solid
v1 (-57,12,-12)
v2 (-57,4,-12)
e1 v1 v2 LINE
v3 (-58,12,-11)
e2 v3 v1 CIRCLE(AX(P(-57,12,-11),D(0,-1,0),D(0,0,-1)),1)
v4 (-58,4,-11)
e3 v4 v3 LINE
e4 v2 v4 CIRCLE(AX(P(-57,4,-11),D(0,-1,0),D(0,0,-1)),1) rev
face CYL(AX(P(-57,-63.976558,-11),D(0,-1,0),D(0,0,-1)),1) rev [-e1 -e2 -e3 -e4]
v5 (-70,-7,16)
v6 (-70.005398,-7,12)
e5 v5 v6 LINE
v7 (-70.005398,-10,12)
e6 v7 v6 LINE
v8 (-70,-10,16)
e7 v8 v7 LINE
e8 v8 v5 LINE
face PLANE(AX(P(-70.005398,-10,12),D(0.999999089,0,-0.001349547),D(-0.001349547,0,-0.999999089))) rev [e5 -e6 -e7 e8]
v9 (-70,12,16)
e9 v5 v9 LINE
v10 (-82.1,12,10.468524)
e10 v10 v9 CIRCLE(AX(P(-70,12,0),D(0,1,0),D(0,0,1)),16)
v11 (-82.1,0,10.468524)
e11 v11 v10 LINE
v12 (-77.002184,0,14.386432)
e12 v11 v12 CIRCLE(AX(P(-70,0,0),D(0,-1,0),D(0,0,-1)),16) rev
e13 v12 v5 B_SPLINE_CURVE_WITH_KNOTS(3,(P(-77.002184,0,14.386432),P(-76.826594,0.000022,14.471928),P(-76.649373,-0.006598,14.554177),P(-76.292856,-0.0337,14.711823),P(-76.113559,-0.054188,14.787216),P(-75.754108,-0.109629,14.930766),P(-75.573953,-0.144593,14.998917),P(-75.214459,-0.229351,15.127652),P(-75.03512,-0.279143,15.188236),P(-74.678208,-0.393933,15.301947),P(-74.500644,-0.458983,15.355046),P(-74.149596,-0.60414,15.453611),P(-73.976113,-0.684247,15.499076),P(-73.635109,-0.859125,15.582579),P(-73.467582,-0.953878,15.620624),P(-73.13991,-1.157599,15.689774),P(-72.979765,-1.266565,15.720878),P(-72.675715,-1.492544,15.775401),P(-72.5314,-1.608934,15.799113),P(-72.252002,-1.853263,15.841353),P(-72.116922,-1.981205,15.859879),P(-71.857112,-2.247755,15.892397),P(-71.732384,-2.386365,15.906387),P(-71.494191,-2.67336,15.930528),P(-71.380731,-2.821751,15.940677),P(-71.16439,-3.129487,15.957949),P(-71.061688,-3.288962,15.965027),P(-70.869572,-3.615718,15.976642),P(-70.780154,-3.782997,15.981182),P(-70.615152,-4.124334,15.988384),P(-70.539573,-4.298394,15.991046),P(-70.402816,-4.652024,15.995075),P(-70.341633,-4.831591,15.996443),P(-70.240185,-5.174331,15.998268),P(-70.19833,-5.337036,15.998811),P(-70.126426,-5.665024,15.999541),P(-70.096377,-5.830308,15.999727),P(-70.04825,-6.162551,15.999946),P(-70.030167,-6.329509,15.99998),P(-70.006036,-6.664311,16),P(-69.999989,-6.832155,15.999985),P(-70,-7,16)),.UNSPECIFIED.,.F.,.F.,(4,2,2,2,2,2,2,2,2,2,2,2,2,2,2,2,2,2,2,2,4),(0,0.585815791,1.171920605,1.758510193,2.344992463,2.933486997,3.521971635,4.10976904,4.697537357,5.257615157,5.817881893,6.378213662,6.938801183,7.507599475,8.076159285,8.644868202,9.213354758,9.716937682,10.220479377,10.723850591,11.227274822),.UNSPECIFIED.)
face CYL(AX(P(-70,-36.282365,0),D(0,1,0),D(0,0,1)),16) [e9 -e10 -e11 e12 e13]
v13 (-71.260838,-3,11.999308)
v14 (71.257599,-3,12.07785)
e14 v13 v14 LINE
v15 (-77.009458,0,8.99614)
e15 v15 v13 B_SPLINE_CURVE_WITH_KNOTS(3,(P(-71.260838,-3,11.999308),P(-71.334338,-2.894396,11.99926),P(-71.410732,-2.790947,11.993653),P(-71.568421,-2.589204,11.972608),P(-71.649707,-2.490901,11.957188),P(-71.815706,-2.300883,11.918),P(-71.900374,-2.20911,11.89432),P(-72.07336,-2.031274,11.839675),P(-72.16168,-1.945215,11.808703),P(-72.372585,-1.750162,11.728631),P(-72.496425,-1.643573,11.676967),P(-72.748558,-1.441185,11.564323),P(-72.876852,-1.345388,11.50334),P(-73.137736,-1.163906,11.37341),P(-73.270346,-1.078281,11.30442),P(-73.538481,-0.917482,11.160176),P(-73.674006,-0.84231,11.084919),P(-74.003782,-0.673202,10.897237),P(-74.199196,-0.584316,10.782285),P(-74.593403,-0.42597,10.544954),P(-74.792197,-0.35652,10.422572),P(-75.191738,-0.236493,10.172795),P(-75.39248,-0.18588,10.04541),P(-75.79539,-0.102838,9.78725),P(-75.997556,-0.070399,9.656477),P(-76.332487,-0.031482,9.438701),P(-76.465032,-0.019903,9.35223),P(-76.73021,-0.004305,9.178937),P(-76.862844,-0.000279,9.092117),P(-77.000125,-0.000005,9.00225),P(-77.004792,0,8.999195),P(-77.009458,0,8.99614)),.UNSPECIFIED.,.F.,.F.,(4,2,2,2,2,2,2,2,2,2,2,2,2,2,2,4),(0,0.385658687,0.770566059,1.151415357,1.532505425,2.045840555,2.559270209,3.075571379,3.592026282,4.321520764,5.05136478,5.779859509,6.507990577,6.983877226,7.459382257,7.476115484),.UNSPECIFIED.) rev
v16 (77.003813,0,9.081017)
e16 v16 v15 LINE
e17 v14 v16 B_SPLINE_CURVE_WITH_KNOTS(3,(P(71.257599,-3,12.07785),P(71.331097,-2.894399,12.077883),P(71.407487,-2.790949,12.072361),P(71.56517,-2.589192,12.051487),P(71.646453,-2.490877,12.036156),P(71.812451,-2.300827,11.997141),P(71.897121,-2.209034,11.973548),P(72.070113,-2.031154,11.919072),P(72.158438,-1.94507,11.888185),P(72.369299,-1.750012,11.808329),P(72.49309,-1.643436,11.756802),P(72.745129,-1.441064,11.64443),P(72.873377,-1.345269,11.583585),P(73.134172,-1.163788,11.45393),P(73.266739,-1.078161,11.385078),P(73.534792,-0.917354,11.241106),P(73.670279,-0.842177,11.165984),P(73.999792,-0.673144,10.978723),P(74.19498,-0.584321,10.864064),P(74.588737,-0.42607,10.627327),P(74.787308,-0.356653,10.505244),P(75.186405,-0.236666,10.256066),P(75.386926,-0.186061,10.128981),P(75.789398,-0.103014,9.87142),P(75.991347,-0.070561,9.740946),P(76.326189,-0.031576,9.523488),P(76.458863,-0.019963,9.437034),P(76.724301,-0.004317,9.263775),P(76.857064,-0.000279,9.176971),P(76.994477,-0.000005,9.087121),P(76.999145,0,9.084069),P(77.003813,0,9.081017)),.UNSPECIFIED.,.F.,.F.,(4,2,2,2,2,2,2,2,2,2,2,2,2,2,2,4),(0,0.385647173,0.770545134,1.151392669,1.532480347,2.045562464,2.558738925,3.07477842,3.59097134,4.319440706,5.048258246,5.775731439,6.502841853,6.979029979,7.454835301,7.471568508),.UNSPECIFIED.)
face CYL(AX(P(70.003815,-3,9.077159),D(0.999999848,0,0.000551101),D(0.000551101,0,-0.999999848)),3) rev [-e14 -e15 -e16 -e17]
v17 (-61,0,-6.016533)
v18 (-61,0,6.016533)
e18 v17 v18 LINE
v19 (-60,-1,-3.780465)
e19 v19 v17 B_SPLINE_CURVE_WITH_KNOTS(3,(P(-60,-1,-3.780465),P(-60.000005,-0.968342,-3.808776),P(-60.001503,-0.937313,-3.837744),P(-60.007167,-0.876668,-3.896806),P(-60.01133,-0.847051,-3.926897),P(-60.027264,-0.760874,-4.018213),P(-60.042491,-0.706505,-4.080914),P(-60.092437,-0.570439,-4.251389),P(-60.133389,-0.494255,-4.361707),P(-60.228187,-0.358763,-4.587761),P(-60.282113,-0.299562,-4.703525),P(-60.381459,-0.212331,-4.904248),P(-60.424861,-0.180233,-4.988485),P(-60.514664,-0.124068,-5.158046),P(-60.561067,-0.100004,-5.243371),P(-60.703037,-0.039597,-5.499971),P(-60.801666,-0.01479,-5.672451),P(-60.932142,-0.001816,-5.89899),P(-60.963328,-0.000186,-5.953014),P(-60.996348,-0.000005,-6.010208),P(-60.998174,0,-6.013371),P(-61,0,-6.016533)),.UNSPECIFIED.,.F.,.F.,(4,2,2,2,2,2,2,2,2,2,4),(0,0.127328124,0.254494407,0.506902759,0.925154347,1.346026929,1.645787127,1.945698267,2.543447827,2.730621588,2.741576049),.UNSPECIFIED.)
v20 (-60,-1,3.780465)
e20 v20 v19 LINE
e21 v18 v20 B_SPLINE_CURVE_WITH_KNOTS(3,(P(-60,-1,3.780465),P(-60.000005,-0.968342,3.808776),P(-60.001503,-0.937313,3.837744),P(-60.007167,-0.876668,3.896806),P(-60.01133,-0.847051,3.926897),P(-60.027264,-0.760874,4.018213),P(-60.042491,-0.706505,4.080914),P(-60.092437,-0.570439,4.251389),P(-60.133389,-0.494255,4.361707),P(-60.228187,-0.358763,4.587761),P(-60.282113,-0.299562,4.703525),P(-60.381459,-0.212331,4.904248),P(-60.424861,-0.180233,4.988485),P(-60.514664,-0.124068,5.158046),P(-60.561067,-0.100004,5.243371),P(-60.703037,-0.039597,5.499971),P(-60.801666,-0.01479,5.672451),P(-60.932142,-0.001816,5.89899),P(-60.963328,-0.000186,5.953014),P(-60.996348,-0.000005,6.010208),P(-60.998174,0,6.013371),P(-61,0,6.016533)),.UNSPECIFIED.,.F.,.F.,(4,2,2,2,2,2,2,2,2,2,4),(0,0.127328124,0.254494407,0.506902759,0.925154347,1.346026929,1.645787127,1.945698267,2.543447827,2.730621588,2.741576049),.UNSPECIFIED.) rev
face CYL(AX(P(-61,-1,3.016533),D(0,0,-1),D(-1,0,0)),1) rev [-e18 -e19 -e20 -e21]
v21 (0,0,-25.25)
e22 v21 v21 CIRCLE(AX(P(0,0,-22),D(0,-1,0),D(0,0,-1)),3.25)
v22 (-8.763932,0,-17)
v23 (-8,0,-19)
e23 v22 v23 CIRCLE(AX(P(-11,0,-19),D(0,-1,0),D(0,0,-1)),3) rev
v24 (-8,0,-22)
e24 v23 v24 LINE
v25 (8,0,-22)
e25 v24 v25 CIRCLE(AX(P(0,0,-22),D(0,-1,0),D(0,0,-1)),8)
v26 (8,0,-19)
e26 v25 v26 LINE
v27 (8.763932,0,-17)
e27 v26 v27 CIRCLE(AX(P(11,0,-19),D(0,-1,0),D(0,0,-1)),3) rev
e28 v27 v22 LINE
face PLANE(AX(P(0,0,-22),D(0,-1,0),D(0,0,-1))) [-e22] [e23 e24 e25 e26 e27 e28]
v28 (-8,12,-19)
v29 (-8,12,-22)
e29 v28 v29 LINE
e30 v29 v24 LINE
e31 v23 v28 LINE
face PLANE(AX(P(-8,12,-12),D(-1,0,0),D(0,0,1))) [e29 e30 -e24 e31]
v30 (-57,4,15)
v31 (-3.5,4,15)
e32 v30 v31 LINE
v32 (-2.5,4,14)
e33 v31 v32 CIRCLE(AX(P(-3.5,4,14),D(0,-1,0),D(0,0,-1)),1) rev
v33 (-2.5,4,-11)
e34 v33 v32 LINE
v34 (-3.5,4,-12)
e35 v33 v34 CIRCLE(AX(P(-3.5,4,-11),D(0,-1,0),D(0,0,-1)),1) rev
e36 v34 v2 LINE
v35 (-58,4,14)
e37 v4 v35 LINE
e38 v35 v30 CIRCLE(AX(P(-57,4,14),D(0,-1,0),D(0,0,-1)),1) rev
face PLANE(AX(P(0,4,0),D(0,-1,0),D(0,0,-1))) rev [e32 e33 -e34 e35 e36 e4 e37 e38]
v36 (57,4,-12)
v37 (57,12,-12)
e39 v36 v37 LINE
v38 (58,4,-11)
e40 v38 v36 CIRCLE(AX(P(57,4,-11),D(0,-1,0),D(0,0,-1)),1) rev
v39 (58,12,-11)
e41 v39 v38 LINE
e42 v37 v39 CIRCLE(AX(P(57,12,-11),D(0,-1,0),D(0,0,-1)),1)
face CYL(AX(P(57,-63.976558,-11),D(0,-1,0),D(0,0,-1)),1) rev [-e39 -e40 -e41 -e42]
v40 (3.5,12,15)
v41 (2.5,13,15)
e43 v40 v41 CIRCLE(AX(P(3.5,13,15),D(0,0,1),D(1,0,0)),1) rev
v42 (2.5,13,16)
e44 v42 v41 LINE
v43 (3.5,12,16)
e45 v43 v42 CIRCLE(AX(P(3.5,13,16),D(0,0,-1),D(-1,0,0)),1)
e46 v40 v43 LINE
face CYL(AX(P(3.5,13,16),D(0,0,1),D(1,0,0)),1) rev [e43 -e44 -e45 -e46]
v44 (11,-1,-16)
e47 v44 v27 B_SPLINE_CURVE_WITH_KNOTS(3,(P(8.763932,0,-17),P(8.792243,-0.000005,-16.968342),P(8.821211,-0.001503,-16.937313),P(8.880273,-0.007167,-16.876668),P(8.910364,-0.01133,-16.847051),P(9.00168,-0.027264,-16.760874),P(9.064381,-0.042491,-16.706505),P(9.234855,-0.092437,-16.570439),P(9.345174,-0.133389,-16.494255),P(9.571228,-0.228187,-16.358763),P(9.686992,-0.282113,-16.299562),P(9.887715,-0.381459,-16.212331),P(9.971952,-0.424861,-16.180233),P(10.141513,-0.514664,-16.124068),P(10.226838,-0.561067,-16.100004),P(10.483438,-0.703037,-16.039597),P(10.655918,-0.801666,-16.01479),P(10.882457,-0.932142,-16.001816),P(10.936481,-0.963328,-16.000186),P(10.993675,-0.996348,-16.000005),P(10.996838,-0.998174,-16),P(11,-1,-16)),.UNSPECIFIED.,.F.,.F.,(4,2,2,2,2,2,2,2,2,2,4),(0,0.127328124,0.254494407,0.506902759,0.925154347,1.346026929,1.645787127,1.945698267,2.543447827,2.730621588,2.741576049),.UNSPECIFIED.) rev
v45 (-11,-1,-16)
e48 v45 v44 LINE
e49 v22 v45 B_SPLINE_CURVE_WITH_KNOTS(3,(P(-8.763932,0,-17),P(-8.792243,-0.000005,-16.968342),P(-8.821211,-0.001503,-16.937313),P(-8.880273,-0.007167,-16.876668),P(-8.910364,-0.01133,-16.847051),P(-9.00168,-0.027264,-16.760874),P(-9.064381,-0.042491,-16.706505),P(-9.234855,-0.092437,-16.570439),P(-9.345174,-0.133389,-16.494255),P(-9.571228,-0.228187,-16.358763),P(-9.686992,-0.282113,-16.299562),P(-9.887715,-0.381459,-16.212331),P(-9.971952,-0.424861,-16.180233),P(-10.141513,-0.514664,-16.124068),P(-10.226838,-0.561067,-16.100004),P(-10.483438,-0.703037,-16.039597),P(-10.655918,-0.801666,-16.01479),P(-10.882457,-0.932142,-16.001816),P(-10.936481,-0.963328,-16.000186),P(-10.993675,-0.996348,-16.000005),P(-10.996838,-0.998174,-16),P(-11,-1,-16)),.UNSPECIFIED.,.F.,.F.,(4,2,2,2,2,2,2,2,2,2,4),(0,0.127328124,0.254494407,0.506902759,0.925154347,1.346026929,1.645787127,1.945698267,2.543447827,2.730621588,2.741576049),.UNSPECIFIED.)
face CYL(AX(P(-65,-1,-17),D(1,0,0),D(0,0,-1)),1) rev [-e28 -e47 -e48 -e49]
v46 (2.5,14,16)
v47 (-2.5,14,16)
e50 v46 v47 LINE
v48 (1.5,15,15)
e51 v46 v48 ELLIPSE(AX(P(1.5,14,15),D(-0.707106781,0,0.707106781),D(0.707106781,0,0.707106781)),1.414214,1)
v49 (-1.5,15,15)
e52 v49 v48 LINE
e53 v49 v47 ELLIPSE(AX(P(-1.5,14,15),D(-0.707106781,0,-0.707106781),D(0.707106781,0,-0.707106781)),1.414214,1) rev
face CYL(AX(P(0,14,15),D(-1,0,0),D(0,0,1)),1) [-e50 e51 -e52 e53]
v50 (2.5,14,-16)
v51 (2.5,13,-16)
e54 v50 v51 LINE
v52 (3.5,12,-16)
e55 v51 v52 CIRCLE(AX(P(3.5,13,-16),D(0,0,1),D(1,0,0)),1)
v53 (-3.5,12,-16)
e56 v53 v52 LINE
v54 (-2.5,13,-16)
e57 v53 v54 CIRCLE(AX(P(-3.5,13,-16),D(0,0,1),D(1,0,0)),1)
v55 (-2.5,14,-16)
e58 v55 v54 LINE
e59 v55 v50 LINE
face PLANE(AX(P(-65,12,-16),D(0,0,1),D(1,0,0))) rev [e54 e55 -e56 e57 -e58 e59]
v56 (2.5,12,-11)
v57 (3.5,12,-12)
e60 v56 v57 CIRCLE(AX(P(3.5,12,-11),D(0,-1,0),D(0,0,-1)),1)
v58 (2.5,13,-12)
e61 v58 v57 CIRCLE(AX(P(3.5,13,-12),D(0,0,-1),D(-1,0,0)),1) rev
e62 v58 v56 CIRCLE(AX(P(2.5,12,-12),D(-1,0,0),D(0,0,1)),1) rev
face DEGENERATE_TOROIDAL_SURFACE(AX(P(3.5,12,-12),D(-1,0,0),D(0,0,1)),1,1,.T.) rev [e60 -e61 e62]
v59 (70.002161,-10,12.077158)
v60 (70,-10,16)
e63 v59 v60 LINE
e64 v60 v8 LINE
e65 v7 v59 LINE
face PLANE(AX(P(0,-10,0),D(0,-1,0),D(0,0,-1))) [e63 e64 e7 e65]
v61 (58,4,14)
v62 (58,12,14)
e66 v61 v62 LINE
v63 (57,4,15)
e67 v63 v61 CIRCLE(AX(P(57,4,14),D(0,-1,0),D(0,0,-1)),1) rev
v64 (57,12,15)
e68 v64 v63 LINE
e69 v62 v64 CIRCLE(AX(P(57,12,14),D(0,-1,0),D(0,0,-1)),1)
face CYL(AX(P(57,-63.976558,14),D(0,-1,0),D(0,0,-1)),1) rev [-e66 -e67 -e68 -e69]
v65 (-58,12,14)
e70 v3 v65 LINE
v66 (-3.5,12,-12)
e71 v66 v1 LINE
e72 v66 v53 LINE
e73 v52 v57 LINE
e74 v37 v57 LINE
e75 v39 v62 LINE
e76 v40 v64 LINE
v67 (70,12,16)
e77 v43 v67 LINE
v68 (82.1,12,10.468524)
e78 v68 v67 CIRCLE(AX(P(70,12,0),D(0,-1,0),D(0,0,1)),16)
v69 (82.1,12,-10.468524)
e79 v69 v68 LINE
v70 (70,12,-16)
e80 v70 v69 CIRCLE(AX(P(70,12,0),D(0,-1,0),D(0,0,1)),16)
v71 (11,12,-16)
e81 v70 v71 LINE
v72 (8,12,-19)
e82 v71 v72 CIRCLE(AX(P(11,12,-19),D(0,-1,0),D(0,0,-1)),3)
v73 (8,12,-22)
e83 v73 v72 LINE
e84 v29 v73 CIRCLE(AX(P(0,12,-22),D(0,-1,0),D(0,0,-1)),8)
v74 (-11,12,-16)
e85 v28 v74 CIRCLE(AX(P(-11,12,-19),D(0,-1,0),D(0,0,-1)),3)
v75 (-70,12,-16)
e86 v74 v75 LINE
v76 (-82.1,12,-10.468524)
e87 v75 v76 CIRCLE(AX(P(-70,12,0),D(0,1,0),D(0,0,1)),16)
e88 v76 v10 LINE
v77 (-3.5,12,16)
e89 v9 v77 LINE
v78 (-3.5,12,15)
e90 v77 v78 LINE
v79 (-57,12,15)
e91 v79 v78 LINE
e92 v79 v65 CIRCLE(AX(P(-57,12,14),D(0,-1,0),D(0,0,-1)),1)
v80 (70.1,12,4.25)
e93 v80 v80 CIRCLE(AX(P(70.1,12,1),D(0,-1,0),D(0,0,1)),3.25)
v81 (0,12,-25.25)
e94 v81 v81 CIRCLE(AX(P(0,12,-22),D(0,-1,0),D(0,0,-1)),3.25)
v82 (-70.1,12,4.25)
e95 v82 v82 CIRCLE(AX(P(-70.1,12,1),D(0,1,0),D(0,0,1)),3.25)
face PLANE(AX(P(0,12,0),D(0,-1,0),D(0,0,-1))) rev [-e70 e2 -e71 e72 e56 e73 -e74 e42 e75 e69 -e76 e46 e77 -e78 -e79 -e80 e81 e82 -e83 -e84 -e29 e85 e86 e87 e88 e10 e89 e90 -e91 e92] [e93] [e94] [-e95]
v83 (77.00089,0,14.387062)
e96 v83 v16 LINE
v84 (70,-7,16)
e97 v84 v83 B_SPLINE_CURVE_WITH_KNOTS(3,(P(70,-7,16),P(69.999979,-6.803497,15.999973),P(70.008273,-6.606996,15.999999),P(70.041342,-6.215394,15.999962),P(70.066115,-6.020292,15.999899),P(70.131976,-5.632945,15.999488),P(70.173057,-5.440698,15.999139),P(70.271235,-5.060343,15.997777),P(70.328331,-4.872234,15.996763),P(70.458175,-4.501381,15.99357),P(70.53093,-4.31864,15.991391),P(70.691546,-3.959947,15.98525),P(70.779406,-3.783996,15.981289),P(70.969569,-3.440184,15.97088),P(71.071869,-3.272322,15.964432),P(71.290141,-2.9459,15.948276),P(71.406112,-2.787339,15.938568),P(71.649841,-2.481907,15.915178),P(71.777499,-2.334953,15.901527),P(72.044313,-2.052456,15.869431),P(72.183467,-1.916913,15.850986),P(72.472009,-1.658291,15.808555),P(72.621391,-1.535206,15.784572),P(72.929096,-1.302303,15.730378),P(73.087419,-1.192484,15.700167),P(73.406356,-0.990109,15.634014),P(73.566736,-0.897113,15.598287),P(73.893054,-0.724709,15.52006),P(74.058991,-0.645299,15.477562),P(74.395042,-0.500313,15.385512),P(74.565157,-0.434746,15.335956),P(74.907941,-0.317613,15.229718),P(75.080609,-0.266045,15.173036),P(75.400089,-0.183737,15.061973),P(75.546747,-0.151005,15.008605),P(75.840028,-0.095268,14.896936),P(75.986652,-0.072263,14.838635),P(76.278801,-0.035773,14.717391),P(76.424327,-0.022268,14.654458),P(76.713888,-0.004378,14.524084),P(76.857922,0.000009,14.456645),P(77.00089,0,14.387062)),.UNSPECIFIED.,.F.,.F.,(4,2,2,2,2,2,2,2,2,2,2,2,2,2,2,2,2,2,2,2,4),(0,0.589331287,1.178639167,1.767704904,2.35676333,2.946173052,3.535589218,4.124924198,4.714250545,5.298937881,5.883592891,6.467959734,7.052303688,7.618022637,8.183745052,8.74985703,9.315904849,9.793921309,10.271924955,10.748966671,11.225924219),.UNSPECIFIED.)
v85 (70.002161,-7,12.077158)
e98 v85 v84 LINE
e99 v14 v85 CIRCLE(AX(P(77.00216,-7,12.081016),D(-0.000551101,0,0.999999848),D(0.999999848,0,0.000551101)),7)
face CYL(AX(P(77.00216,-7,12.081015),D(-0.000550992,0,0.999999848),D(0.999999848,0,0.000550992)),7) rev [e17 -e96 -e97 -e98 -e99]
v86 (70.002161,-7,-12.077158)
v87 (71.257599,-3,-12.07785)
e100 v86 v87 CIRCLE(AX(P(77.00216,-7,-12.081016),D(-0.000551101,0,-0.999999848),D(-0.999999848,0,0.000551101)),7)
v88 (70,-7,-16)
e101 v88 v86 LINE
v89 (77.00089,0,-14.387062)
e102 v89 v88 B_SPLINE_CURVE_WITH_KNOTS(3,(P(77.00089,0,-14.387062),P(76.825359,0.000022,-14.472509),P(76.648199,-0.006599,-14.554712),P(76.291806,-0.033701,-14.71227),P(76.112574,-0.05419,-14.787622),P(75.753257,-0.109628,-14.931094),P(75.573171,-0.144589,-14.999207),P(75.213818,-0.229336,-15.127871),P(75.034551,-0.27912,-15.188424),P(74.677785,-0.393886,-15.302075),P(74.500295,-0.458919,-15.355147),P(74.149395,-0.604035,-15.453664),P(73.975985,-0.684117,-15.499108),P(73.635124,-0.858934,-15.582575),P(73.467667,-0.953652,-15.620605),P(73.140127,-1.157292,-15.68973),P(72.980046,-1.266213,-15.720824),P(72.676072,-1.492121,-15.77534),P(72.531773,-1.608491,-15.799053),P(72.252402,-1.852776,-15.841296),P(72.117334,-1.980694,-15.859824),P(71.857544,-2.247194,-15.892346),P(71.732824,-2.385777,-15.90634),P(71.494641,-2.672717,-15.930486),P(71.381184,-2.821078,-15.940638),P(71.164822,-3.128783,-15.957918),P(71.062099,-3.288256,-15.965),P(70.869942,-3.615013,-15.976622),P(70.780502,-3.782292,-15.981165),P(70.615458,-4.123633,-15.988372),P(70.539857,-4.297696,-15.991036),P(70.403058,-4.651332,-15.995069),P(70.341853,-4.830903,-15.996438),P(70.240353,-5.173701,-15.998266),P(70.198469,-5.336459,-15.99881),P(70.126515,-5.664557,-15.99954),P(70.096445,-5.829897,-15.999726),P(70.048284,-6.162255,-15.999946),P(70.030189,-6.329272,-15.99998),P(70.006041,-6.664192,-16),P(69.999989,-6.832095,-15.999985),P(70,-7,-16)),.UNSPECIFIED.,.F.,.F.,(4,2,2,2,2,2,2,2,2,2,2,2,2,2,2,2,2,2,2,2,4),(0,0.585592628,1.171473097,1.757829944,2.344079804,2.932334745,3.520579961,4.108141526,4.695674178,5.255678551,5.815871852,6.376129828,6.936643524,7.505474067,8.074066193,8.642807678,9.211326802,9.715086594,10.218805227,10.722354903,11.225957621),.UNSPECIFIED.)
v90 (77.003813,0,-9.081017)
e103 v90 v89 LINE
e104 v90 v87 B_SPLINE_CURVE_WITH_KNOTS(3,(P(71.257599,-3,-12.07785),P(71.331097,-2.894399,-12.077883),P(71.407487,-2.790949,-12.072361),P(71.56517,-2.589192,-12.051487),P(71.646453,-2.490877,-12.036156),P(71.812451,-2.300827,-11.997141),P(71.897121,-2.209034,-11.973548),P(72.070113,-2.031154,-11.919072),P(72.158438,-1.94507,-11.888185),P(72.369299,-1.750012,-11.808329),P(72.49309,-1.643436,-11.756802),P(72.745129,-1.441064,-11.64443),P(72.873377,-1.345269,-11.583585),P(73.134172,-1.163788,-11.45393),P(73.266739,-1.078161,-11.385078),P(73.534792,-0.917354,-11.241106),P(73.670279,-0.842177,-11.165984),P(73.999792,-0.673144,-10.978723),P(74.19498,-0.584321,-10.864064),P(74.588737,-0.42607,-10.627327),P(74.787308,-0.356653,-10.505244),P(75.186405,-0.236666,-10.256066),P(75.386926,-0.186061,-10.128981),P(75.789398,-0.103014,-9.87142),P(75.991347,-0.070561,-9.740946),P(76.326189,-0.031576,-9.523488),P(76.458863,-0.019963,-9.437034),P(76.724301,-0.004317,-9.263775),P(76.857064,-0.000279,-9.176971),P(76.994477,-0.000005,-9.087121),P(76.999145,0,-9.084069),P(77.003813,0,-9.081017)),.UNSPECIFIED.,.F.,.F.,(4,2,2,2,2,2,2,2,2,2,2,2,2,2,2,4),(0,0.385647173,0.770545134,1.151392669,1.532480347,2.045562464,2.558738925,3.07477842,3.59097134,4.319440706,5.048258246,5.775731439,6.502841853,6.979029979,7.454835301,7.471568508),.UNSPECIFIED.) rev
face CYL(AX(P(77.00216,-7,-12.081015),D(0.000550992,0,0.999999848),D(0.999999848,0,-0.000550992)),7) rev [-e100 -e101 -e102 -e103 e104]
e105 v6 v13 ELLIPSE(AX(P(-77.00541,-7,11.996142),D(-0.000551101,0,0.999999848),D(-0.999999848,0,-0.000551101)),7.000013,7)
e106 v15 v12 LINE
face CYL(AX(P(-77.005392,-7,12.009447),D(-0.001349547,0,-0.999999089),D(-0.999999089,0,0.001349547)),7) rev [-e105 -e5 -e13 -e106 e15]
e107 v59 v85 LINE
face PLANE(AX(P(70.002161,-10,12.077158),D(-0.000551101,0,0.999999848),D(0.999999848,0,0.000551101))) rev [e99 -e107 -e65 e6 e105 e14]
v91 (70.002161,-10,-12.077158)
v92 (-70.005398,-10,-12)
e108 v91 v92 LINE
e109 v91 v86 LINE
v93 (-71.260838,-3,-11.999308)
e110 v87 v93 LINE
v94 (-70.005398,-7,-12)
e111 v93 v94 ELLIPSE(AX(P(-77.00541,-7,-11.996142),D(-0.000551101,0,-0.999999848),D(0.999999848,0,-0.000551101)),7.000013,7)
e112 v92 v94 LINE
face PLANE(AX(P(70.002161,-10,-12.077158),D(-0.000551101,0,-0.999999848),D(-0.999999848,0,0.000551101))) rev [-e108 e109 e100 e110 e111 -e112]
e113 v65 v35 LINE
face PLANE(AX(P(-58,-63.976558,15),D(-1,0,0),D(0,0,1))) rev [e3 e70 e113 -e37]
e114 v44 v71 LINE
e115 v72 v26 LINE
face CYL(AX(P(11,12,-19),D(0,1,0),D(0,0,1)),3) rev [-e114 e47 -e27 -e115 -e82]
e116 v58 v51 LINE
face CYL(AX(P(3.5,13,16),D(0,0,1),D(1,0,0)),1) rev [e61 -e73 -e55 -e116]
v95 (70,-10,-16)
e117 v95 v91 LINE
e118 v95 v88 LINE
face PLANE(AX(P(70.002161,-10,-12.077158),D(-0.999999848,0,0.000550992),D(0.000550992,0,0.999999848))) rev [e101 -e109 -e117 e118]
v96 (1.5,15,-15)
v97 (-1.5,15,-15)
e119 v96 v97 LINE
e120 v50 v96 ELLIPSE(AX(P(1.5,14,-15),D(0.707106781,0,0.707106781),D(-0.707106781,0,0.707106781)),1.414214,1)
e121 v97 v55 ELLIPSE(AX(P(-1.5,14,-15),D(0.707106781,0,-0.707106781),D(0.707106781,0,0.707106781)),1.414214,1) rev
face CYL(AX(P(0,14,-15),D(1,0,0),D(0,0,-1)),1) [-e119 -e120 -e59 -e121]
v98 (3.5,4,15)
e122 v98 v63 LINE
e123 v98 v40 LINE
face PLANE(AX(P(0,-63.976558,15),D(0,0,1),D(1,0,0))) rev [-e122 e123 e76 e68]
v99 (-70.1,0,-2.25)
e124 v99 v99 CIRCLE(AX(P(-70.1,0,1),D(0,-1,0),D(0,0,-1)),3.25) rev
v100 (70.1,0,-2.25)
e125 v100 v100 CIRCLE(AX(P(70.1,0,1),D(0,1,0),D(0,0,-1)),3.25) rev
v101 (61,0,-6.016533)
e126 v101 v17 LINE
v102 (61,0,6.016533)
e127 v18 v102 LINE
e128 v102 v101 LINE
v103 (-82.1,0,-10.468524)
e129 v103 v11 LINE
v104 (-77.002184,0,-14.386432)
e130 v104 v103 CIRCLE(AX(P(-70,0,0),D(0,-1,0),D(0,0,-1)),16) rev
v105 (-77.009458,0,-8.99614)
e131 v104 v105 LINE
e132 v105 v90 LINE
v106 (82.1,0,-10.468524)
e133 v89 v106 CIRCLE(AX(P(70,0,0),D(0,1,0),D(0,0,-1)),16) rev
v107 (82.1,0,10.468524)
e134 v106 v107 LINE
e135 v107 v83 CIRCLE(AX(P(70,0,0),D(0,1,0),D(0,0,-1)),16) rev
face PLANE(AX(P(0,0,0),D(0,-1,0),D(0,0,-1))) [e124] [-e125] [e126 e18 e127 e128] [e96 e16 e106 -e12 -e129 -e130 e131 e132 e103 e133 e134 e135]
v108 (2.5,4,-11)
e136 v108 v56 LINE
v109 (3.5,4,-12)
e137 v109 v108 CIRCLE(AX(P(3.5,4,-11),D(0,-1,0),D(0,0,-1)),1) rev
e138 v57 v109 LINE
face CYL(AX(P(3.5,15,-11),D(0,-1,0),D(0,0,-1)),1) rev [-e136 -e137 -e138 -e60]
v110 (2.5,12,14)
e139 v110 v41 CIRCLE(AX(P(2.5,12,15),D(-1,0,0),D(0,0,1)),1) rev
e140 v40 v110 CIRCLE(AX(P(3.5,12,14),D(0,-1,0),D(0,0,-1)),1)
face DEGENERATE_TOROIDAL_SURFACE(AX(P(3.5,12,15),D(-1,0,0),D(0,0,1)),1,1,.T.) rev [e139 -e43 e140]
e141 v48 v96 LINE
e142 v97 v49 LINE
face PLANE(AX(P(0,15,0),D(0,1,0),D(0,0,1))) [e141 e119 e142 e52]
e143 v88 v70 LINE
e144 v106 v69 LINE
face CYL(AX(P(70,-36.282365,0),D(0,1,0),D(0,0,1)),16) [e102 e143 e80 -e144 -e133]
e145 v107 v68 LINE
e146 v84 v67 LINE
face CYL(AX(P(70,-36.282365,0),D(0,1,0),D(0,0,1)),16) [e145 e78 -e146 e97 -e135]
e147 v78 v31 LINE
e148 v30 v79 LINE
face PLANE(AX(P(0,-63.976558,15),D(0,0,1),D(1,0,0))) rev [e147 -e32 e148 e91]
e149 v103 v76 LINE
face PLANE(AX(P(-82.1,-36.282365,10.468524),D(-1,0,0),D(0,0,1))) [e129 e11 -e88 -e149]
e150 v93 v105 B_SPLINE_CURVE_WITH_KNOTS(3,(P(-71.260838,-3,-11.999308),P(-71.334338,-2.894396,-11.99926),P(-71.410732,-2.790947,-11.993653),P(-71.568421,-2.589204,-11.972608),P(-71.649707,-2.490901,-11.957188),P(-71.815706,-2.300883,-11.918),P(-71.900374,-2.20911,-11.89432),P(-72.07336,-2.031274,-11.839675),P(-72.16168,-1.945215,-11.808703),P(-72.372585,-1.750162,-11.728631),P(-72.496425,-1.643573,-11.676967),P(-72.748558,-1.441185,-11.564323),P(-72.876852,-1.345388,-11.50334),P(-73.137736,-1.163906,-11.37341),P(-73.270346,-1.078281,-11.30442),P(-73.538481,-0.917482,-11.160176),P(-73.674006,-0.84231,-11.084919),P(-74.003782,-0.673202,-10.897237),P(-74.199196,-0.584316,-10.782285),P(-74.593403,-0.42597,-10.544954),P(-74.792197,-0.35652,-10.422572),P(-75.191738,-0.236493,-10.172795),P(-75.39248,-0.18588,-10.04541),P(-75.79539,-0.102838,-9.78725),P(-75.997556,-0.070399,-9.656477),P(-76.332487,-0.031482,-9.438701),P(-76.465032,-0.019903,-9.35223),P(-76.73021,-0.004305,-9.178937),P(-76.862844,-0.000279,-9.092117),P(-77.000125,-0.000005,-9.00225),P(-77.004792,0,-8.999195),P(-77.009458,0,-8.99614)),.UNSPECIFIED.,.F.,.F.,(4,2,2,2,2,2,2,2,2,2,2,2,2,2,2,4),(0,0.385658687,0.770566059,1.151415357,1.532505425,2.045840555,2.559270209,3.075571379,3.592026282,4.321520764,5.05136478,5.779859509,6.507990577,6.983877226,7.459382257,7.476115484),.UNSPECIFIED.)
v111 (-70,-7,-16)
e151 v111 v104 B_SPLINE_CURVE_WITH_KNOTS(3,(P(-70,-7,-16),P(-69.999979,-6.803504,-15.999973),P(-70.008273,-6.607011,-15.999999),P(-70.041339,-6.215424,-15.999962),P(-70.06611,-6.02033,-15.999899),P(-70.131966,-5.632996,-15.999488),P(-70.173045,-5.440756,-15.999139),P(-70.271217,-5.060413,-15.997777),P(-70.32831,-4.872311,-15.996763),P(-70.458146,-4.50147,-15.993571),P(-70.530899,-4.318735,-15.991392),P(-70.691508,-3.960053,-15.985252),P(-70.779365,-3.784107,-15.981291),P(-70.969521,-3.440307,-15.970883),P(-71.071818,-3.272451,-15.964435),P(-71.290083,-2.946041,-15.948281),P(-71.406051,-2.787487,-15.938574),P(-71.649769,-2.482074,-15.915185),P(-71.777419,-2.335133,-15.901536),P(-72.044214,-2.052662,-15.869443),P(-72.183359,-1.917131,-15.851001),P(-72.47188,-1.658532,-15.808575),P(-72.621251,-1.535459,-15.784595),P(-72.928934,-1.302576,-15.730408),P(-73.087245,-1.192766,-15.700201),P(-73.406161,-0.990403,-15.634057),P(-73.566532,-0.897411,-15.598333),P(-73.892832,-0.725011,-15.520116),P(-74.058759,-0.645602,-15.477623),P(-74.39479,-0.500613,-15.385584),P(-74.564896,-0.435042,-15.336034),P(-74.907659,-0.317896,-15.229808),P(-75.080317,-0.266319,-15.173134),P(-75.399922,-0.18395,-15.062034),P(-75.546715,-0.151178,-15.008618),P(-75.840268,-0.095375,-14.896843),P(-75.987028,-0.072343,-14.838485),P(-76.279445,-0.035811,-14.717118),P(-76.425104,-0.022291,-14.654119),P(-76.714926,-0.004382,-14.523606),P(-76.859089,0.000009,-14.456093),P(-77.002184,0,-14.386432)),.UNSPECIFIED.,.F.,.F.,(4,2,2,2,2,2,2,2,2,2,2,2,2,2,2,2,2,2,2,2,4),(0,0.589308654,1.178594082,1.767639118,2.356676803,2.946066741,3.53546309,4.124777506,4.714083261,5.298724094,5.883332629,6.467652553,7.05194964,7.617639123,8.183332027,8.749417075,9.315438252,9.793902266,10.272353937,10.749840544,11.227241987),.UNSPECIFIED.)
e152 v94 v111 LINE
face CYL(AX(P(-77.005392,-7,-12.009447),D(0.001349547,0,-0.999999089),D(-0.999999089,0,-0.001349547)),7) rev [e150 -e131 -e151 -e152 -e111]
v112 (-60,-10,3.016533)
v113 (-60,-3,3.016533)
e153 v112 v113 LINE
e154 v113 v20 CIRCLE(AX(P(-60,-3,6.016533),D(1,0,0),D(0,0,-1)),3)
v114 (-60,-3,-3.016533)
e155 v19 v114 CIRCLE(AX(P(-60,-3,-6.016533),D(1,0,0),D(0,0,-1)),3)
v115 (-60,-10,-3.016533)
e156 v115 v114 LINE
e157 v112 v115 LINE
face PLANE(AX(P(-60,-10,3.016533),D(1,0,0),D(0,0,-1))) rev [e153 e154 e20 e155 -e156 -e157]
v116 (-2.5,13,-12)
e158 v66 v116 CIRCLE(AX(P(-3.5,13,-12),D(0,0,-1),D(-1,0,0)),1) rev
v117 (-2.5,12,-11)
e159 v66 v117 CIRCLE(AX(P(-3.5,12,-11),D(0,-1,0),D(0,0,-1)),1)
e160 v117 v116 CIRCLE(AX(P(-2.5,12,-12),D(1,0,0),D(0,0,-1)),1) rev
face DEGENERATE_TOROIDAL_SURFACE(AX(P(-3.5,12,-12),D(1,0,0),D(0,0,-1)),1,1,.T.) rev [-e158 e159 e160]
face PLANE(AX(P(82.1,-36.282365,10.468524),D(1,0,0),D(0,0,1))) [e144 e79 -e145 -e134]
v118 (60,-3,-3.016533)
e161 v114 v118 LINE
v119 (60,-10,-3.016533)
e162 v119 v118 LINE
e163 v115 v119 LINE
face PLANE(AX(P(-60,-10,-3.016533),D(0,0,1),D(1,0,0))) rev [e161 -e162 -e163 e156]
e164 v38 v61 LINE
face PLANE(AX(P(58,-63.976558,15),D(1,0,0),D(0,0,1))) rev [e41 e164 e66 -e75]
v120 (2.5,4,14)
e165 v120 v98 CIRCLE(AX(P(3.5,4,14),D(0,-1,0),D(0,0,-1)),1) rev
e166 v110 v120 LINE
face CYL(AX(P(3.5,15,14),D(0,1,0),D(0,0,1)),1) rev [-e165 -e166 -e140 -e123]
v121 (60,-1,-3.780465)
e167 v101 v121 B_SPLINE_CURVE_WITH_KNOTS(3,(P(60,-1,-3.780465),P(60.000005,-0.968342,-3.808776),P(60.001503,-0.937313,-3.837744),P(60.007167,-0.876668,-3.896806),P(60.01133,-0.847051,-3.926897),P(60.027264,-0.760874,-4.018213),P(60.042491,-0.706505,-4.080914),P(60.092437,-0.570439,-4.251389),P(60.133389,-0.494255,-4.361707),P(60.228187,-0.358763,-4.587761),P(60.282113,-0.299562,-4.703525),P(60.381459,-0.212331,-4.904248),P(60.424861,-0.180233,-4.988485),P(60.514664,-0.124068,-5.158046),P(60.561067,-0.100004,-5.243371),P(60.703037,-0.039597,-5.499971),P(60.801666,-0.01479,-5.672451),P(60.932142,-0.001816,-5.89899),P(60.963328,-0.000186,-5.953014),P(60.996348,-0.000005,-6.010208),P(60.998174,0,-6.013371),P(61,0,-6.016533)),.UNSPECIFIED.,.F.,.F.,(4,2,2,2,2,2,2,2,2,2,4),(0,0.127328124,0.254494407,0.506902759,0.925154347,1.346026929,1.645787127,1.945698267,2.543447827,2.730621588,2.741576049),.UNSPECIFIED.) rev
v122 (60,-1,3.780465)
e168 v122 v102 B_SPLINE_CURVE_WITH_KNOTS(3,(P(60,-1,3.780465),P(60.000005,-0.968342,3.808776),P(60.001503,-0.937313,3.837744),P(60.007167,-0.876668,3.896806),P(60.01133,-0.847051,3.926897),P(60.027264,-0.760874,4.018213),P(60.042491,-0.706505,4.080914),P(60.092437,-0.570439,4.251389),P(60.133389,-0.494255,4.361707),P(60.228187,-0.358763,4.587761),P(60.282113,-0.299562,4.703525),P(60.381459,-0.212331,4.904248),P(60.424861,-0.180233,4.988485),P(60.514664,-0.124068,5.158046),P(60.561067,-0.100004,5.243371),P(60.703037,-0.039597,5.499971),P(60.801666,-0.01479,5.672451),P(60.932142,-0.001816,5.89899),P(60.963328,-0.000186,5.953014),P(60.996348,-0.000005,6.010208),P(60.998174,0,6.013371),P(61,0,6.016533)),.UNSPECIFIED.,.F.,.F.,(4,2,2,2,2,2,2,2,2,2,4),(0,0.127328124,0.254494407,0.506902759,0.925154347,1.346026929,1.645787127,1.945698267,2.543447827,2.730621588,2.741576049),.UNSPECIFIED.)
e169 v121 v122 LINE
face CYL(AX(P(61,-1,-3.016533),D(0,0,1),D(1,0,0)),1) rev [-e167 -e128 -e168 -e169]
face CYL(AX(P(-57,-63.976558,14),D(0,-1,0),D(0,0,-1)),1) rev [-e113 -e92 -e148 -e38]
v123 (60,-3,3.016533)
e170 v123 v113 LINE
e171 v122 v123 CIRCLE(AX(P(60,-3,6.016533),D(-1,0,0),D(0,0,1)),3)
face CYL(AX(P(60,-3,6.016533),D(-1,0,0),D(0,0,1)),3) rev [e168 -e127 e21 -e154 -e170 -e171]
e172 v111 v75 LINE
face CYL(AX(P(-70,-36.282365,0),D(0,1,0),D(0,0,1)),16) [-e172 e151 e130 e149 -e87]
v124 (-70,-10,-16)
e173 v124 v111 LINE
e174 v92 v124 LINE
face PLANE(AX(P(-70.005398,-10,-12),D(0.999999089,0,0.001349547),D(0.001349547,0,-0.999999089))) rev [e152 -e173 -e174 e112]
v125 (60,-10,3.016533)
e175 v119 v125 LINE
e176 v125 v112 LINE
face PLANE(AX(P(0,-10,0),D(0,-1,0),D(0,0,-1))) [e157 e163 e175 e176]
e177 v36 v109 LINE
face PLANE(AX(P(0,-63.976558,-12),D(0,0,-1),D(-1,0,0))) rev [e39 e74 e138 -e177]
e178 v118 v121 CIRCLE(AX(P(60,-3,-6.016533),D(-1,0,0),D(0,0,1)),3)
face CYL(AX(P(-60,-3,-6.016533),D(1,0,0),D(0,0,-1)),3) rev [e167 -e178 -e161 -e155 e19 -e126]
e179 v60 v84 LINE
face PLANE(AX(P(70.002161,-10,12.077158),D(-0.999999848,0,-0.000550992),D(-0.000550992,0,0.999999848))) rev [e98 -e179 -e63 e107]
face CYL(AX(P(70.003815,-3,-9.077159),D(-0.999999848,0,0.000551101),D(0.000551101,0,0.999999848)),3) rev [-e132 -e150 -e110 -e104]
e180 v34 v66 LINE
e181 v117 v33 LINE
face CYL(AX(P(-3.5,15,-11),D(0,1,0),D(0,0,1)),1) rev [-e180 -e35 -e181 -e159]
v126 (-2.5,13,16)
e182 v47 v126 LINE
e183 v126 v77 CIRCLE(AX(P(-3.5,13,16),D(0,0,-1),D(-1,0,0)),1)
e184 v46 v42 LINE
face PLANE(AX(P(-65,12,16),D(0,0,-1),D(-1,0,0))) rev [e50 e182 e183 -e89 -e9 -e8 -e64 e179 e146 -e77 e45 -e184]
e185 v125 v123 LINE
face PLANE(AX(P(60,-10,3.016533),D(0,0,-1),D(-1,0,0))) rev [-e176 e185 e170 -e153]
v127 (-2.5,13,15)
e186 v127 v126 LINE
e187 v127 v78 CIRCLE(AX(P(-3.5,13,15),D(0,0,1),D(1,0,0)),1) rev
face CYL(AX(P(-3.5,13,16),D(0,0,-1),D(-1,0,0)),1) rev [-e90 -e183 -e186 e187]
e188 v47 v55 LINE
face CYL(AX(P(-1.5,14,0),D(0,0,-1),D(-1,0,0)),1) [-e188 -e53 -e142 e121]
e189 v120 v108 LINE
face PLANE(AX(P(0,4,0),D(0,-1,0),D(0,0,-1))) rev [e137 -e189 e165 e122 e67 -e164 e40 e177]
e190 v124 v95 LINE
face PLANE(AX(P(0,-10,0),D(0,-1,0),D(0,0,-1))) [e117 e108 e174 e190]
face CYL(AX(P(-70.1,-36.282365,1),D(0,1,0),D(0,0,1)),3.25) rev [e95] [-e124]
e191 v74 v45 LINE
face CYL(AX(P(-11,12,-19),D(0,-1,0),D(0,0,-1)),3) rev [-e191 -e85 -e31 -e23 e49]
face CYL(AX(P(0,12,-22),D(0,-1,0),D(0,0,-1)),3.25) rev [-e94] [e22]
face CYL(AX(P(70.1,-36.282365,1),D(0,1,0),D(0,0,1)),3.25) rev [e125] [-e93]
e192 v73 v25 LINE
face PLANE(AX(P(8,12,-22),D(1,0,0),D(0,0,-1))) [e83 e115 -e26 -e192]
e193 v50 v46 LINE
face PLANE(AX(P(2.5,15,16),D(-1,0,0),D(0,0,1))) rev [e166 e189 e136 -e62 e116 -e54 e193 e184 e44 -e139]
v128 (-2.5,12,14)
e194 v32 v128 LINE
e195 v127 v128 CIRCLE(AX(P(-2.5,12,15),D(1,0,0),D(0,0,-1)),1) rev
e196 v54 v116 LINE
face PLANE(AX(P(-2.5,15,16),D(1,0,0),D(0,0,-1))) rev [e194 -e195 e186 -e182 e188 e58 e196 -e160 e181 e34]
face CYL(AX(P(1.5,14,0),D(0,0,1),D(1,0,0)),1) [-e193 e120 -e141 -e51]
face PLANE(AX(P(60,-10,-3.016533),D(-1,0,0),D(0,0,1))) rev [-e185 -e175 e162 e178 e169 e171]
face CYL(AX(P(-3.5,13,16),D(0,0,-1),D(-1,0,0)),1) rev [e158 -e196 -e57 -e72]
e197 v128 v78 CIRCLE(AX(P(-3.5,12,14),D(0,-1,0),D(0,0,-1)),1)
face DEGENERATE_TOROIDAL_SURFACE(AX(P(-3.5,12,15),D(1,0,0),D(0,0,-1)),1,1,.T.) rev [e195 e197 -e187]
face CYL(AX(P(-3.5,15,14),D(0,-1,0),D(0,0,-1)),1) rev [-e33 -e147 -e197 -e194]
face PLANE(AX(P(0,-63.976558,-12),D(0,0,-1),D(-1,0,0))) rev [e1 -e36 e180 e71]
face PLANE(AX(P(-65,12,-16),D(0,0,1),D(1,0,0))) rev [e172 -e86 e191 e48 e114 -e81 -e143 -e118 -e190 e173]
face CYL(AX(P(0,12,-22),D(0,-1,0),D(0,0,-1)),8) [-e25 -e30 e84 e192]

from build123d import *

# Parameters (mm, degrees)
SKETCH1_W           = 65
SKETCH1_H           = 32
BOSS_EXTRUDE1_DEPTH = 12
SKETCH10_R          = 3.25
BOLT_EXTRUDE_DEPTH  = 12
SKETCH7_W           = 58
SKETCH7_H           = 27
CUT_EXTRUDE5_DEPTH  = 8
SKETCH8_W           = 5
SKETCH8_H           = 32
BOSS_EXTRUDE3_DEPTH = 11
FILLET6_START       = 3
FILLET6_DEPTH       = 9
FILLET6_START_2     = -16
FILLET6_2_DEPTH     = 4
FILLET6_START_3     = 15
FILLET6_3_DEPTH     = 1
FILLET6_4_ANGLE     = 90
FILLET6_5_ANGLE     = 90
FILLET6_6_ANGLE     = 90
FILLET6_7_ANGLE     = 90
FILLET9_R           = 1
SKETCH11_W          = 120
SKETCH11_H          = 6.033066078
BOSS_EXTRUDE4_DEPTH = 10
SKETCH12_R          = 3.25
BOSS_EXTRUDE5_DEPTH = 12
FILLET11_R          = 7
FILLET12_R          = 3
FILLET13_R          = 3
FILLET15_R          = 1
FILLET16_R          = 1


with BuildPart() as part:
    # Sketch1 → Boss-Extrude1 (new body)
    with BuildSketch(Plane(origin=(0, 0, 0), x_dir=(1, 0, 0), z_dir=(0, 1, 0))):
        with Locations((-32.5, 0)):
            Rectangle(SKETCH1_W, SKETCH1_H)
    extrude(amount=BOSS_EXTRUDE1_DEPTH)

    # Sketch10 → bolt extrude (add)
    with BuildSketch(Plane(origin=(0, 12, 0), x_dir=(1, 0, 0), z_dir=(0, 1, 0))):
        with BuildLine():
            Line((-65, 16), (-70, 16))
            ThreePointArc((-70, 16), (-76.652203093, 14.551570156), (-82.1, 10.468524251))
            Line((-82.1, 10.468524251), (-82.1, -10.468524251))
            ThreePointArc((-82.1, -10.468524251), (-76.652203093, -14.551570156), (-70, -16))
            Line((-70, -16), (-65, -16))
            Line((-65, -16), (-65, 16))
        make_face()
        with Locations(Location((-70.1, -1, 0), (0, 0, 270))):
            Circle(SKETCH10_R, mode=Mode.SUBTRACT)
    extrude(amount=-BOLT_EXTRUDE_DEPTH)

    # Sketch7 → Cut-Extrude5 (cut)
    with BuildSketch(Plane(origin=(0, 12, 0), x_dir=(1, 0, 0), z_dir=(0, 1, 0))):
        with Locations((-29, -1.5)):
            Rectangle(SKETCH7_W, SKETCH7_H)
    extrude(amount=-CUT_EXTRUDE5_DEPTH, mode=Mode.SUBTRACT)

    # Mirror1: part across plane


with BuildPart() as part_1:
    add(part.part)
    add(part.part.mirror(Plane(origin=(0, 0, 0), x_dir=(0, 0, 1), z_dir=(1, 0, 0))))

    # Sketch8 → Boss-Extrude3 (add)
    with BuildSketch(Plane(origin=(0, 4, 0), x_dir=(1, 0, 0), z_dir=(0, 1, 0))):
        Rectangle(SKETCH8_W, SKETCH8_H)
    extrude(amount=BOSS_EXTRUDE3_DEPTH)

    # Fillet6: read off the stored shape, not the designer's step
    # Fillet6 outline → Fillet6 (add)
    with BuildSketch(Plane(origin=(0, 0, 0), x_dir=(1, 0, 0), z_dir=(0, 1, 0)).offset(FILLET6_START)):
        with BuildLine():
            Line((-2.5, -15), (-2.5, -14))
            ThreePointArc((-2.5, -14), (-2.792893219, -14.707106781), (-3.5, -15))
            Line((-3.5, -15), (-2.5, -15))
        make_face()
        with BuildLine():
            ThreePointArc((-3.5, 12), (-2.792893219, 11.707106781), (-2.5, 11))
            Line((-2.5, 11), (-2.5, 12))
            Line((-2.5, 12), (-3.5, 12))
        make_face()
        with BuildLine():
            Line((-58, -15), (-57, -15))
            ThreePointArc((-57, -15), (-57.707106781, -14.707106781), (-58, -14))
            Line((-58, -14), (-58, -15))
        make_face()
        with BuildLine():
            ThreePointArc((-58, 11), (-57.707106781, 11.707106781), (-57, 12))
            Line((-57, 12), (-58, 12))
            Line((-58, 12), (-58, 11))
        make_face()
        with BuildLine():
            Line((2.5, -14), (2.5, -15))
            Line((2.5, -15), (3.5, -15))
            ThreePointArc((3.5, -15), (2.792893219, -14.707106781), (2.5, -14))
        make_face()
        with BuildLine():
            Line((3.5, 12), (2.5, 12))
            Line((2.5, 12), (2.5, 11))
            ThreePointArc((2.5, 11), (2.792893219, 11.707106781), (3.5, 12))
        make_face()
        with BuildLine():
            ThreePointArc((58, -14), (57.707106781, -14.707106781), (57, -15))
            Line((57, -15), (58, -15))
            Line((58, -15), (58, -14))
        make_face()
        with BuildLine():
            Line((58, 12), (57, 12))
            ThreePointArc((57, 12), (57.707106781, 11.707106781), (58, 11))
            Line((58, 11), (58, 12))
        make_face()
    extrude(amount=FILLET6_DEPTH)

    # Fillet6 2 outline → Fillet6 2 (add)
    with BuildSketch(Plane.XY.offset(FILLET6_START_2)):
        with BuildLine():
            Line((-2.5, 12), (-2.5, 13))
            ThreePointArc((-2.5, 13), (-2.792893219, 12.292893219), (-3.5, 12))
            Line((-3.5, 12), (-2.5, 12))
        make_face()
        with BuildLine():
            ThreePointArc((3.5, 12), (2.792893219, 12.292893219), (2.5, 13))
            Line((2.5, 13), (2.5, 12))
            Line((2.5, 12), (3.5, 12))
        make_face()
    extrude(amount=FILLET6_2_DEPTH)

    # Fillet6 3 outline → Fillet6 3 (add)
    with BuildSketch(Plane.XY.offset(FILLET6_START_3)):
        with BuildLine():
            Line((-2.5, 12), (-2.5, 13))
            ThreePointArc((-2.5, 13), (-2.792893219, 12.292893219), (-3.5, 12))
            Line((-3.5, 12), (-2.5, 12))
        make_face()
        with BuildLine():
            ThreePointArc((3.5, 12), (2.792893219, 12.292893219), (2.5, 13))
            Line((2.5, 13), (2.5, 12))
            Line((2.5, 12), (3.5, 12))
        make_face()
    extrude(amount=FILLET6_3_DEPTH)

    # Fillet6 4 outline → Fillet6 4 (revolve)
    with BuildSketch(Plane(origin=(0, 12, 15), x_dir=(0, 0, -1), z_dir=(0, -1, 0))):
        with BuildLine():
            ThreePointArc((0, -3.5), (0.292893219, -2.792893219), (1, -2.5))
            Line((1, -2.5), (0, -2.5))
            Line((0, -2.5), (0, -3.5))
        make_face()
    revolve(axis=Axis((0, 12, 15), (1, 0, 0)), revolution_arc=FILLET6_4_ANGLE)

    # Fillet6 5 outline → Fillet6 5 (revolve)
    with BuildSketch(Plane(origin=(0, 12, -12), x_dir=(0, 1, 0), z_dir=(0, 0, -1))):
        with BuildLine():
            ThreePointArc((0, -3.5), (0.292893219, -2.792893219), (1, -2.5))
            Line((1, -2.5), (0, -2.5))
            Line((0, -2.5), (0, -3.5))
        make_face()
    revolve(axis=Axis((0, 12, -12), (1, 0, 0)), revolution_arc=FILLET6_5_ANGLE)

    # Fillet6 6 outline → Fillet6 6 (revolve)
    with BuildSketch(Plane(origin=(0, 12, -12), x_dir=(0, 1, 0), z_dir=(0, 0, -1))):
        with BuildLine():
            Line((0, 2.5), (1, 2.5))
            ThreePointArc((1, 2.5), (0.292893219, 2.792893219), (0, 3.5))
            Line((0, 3.5), (0, 2.5))
        make_face()
    revolve(axis=Axis((0, 12, -12), (1, 0, 0)), revolution_arc=FILLET6_6_ANGLE)

    # Fillet6 7 outline → Fillet6 7 (revolve)
    with BuildSketch(Plane(origin=(0, 12, 15), x_dir=(0, 0, -1), z_dir=(0, -1, 0))):
        with BuildLine():
            Line((0, 2.5), (1, 2.5))
            ThreePointArc((1, 2.5), (0.292893219, 2.792893219), (0, 3.5))
            Line((0, 3.5), (0, 2.5))
        make_face()
    revolve(axis=Axis((0, 12, 15), (1, 0, 0)), revolution_arc=FILLET6_7_ANGLE)

    # Fillet9
    fillet9_edges = [part_1.edges().sort_by_distance(p)[0] for p in [
        (2.5, 15, 0),
        (0, 15, -16),
        (-2.5, 15, 0),
        (0, 15, 16),
    ]]
    fillet(fillet9_edges, radius=FILLET9_R)

    # Sketch11 → Boss-Extrude4 (add)
    with BuildSketch(Plane.XZ):
        Polygon((70.002161454, 12.077158354), (-70.005398194, 12), (-70, 16), (70, 16), align=None)
        Rectangle(SKETCH11_W, SKETCH11_H)
        Polygon((70.002161454, -12.077158354), (70, -16), (-70, -16), (-70.005398194, -12), align=None)
    extrude(amount=BOSS_EXTRUDE4_DEPTH)

    # Sketch12 → Boss-Extrude5 (add)
    with BuildSketch(Plane.XZ):
        with BuildLine():
            Line((-8, -12), (-8, -22))
            ThreePointArc((-8, -22), (0, -30), (8, -22))
            Line((8, -22), (8, -12))
            Line((8, -12), (-8, -12))
        make_face()
        with Locations(Location((0, -22, 0), (0, 0, 270))):
            Circle(SKETCH12_R, mode=Mode.SUBTRACT)
    extrude(amount=-BOSS_EXTRUDE5_DEPTH)

    # Fillet11
    fillet11_edges = [part_1.edges().sort_by_distance(p)[0] for p in [
        (-70.002699097, 0, -14),
        (70.001080727, 0, -14.038579177),
        (-70.002699097, 0, 14),
        (70.001080727, 0, 14.038579177),
    ]]
    fillet(fillet11_edges, radius=FILLET11_R)

    # Fillet12
    fillet12_edges = [part_1.edges().sort_by_distance(p)[0] for p in [
        (0, 0, 3.016533039),
        (0, 0, -3.016533039),
        (-0.001624692, 0, 12.038579173),
        (-0.001624692, 0, -12.038579173),
    ]]
    fillet(fillet12_edges, radius=FILLET12_R)

    # Fillet13
    fillet13_edges = [part_1.edges().sort_by_distance(p)[0] for p in [
        (-8, 6, -16),
        (8, 6, -16),
    ]]
    fillet(fillet13_edges, radius=FILLET13_R)

    # Fillet15
    fillet15_edges = [part_1.edges().sort_by_distance(p)[0] for p in [
        (0, 0, -16),
    ]]
    fillet(fillet15_edges, radius=FILLET15_R)

    # Fillet16
    fillet16_edges = [part_1.edges().sort_by_distance(p)[0] for p in [
        (60, 0, 0),
        (-60, 0, 0),
    ]]
    fillet(fillet16_edges, radius=FILLET16_R)


solid = part_1.part
